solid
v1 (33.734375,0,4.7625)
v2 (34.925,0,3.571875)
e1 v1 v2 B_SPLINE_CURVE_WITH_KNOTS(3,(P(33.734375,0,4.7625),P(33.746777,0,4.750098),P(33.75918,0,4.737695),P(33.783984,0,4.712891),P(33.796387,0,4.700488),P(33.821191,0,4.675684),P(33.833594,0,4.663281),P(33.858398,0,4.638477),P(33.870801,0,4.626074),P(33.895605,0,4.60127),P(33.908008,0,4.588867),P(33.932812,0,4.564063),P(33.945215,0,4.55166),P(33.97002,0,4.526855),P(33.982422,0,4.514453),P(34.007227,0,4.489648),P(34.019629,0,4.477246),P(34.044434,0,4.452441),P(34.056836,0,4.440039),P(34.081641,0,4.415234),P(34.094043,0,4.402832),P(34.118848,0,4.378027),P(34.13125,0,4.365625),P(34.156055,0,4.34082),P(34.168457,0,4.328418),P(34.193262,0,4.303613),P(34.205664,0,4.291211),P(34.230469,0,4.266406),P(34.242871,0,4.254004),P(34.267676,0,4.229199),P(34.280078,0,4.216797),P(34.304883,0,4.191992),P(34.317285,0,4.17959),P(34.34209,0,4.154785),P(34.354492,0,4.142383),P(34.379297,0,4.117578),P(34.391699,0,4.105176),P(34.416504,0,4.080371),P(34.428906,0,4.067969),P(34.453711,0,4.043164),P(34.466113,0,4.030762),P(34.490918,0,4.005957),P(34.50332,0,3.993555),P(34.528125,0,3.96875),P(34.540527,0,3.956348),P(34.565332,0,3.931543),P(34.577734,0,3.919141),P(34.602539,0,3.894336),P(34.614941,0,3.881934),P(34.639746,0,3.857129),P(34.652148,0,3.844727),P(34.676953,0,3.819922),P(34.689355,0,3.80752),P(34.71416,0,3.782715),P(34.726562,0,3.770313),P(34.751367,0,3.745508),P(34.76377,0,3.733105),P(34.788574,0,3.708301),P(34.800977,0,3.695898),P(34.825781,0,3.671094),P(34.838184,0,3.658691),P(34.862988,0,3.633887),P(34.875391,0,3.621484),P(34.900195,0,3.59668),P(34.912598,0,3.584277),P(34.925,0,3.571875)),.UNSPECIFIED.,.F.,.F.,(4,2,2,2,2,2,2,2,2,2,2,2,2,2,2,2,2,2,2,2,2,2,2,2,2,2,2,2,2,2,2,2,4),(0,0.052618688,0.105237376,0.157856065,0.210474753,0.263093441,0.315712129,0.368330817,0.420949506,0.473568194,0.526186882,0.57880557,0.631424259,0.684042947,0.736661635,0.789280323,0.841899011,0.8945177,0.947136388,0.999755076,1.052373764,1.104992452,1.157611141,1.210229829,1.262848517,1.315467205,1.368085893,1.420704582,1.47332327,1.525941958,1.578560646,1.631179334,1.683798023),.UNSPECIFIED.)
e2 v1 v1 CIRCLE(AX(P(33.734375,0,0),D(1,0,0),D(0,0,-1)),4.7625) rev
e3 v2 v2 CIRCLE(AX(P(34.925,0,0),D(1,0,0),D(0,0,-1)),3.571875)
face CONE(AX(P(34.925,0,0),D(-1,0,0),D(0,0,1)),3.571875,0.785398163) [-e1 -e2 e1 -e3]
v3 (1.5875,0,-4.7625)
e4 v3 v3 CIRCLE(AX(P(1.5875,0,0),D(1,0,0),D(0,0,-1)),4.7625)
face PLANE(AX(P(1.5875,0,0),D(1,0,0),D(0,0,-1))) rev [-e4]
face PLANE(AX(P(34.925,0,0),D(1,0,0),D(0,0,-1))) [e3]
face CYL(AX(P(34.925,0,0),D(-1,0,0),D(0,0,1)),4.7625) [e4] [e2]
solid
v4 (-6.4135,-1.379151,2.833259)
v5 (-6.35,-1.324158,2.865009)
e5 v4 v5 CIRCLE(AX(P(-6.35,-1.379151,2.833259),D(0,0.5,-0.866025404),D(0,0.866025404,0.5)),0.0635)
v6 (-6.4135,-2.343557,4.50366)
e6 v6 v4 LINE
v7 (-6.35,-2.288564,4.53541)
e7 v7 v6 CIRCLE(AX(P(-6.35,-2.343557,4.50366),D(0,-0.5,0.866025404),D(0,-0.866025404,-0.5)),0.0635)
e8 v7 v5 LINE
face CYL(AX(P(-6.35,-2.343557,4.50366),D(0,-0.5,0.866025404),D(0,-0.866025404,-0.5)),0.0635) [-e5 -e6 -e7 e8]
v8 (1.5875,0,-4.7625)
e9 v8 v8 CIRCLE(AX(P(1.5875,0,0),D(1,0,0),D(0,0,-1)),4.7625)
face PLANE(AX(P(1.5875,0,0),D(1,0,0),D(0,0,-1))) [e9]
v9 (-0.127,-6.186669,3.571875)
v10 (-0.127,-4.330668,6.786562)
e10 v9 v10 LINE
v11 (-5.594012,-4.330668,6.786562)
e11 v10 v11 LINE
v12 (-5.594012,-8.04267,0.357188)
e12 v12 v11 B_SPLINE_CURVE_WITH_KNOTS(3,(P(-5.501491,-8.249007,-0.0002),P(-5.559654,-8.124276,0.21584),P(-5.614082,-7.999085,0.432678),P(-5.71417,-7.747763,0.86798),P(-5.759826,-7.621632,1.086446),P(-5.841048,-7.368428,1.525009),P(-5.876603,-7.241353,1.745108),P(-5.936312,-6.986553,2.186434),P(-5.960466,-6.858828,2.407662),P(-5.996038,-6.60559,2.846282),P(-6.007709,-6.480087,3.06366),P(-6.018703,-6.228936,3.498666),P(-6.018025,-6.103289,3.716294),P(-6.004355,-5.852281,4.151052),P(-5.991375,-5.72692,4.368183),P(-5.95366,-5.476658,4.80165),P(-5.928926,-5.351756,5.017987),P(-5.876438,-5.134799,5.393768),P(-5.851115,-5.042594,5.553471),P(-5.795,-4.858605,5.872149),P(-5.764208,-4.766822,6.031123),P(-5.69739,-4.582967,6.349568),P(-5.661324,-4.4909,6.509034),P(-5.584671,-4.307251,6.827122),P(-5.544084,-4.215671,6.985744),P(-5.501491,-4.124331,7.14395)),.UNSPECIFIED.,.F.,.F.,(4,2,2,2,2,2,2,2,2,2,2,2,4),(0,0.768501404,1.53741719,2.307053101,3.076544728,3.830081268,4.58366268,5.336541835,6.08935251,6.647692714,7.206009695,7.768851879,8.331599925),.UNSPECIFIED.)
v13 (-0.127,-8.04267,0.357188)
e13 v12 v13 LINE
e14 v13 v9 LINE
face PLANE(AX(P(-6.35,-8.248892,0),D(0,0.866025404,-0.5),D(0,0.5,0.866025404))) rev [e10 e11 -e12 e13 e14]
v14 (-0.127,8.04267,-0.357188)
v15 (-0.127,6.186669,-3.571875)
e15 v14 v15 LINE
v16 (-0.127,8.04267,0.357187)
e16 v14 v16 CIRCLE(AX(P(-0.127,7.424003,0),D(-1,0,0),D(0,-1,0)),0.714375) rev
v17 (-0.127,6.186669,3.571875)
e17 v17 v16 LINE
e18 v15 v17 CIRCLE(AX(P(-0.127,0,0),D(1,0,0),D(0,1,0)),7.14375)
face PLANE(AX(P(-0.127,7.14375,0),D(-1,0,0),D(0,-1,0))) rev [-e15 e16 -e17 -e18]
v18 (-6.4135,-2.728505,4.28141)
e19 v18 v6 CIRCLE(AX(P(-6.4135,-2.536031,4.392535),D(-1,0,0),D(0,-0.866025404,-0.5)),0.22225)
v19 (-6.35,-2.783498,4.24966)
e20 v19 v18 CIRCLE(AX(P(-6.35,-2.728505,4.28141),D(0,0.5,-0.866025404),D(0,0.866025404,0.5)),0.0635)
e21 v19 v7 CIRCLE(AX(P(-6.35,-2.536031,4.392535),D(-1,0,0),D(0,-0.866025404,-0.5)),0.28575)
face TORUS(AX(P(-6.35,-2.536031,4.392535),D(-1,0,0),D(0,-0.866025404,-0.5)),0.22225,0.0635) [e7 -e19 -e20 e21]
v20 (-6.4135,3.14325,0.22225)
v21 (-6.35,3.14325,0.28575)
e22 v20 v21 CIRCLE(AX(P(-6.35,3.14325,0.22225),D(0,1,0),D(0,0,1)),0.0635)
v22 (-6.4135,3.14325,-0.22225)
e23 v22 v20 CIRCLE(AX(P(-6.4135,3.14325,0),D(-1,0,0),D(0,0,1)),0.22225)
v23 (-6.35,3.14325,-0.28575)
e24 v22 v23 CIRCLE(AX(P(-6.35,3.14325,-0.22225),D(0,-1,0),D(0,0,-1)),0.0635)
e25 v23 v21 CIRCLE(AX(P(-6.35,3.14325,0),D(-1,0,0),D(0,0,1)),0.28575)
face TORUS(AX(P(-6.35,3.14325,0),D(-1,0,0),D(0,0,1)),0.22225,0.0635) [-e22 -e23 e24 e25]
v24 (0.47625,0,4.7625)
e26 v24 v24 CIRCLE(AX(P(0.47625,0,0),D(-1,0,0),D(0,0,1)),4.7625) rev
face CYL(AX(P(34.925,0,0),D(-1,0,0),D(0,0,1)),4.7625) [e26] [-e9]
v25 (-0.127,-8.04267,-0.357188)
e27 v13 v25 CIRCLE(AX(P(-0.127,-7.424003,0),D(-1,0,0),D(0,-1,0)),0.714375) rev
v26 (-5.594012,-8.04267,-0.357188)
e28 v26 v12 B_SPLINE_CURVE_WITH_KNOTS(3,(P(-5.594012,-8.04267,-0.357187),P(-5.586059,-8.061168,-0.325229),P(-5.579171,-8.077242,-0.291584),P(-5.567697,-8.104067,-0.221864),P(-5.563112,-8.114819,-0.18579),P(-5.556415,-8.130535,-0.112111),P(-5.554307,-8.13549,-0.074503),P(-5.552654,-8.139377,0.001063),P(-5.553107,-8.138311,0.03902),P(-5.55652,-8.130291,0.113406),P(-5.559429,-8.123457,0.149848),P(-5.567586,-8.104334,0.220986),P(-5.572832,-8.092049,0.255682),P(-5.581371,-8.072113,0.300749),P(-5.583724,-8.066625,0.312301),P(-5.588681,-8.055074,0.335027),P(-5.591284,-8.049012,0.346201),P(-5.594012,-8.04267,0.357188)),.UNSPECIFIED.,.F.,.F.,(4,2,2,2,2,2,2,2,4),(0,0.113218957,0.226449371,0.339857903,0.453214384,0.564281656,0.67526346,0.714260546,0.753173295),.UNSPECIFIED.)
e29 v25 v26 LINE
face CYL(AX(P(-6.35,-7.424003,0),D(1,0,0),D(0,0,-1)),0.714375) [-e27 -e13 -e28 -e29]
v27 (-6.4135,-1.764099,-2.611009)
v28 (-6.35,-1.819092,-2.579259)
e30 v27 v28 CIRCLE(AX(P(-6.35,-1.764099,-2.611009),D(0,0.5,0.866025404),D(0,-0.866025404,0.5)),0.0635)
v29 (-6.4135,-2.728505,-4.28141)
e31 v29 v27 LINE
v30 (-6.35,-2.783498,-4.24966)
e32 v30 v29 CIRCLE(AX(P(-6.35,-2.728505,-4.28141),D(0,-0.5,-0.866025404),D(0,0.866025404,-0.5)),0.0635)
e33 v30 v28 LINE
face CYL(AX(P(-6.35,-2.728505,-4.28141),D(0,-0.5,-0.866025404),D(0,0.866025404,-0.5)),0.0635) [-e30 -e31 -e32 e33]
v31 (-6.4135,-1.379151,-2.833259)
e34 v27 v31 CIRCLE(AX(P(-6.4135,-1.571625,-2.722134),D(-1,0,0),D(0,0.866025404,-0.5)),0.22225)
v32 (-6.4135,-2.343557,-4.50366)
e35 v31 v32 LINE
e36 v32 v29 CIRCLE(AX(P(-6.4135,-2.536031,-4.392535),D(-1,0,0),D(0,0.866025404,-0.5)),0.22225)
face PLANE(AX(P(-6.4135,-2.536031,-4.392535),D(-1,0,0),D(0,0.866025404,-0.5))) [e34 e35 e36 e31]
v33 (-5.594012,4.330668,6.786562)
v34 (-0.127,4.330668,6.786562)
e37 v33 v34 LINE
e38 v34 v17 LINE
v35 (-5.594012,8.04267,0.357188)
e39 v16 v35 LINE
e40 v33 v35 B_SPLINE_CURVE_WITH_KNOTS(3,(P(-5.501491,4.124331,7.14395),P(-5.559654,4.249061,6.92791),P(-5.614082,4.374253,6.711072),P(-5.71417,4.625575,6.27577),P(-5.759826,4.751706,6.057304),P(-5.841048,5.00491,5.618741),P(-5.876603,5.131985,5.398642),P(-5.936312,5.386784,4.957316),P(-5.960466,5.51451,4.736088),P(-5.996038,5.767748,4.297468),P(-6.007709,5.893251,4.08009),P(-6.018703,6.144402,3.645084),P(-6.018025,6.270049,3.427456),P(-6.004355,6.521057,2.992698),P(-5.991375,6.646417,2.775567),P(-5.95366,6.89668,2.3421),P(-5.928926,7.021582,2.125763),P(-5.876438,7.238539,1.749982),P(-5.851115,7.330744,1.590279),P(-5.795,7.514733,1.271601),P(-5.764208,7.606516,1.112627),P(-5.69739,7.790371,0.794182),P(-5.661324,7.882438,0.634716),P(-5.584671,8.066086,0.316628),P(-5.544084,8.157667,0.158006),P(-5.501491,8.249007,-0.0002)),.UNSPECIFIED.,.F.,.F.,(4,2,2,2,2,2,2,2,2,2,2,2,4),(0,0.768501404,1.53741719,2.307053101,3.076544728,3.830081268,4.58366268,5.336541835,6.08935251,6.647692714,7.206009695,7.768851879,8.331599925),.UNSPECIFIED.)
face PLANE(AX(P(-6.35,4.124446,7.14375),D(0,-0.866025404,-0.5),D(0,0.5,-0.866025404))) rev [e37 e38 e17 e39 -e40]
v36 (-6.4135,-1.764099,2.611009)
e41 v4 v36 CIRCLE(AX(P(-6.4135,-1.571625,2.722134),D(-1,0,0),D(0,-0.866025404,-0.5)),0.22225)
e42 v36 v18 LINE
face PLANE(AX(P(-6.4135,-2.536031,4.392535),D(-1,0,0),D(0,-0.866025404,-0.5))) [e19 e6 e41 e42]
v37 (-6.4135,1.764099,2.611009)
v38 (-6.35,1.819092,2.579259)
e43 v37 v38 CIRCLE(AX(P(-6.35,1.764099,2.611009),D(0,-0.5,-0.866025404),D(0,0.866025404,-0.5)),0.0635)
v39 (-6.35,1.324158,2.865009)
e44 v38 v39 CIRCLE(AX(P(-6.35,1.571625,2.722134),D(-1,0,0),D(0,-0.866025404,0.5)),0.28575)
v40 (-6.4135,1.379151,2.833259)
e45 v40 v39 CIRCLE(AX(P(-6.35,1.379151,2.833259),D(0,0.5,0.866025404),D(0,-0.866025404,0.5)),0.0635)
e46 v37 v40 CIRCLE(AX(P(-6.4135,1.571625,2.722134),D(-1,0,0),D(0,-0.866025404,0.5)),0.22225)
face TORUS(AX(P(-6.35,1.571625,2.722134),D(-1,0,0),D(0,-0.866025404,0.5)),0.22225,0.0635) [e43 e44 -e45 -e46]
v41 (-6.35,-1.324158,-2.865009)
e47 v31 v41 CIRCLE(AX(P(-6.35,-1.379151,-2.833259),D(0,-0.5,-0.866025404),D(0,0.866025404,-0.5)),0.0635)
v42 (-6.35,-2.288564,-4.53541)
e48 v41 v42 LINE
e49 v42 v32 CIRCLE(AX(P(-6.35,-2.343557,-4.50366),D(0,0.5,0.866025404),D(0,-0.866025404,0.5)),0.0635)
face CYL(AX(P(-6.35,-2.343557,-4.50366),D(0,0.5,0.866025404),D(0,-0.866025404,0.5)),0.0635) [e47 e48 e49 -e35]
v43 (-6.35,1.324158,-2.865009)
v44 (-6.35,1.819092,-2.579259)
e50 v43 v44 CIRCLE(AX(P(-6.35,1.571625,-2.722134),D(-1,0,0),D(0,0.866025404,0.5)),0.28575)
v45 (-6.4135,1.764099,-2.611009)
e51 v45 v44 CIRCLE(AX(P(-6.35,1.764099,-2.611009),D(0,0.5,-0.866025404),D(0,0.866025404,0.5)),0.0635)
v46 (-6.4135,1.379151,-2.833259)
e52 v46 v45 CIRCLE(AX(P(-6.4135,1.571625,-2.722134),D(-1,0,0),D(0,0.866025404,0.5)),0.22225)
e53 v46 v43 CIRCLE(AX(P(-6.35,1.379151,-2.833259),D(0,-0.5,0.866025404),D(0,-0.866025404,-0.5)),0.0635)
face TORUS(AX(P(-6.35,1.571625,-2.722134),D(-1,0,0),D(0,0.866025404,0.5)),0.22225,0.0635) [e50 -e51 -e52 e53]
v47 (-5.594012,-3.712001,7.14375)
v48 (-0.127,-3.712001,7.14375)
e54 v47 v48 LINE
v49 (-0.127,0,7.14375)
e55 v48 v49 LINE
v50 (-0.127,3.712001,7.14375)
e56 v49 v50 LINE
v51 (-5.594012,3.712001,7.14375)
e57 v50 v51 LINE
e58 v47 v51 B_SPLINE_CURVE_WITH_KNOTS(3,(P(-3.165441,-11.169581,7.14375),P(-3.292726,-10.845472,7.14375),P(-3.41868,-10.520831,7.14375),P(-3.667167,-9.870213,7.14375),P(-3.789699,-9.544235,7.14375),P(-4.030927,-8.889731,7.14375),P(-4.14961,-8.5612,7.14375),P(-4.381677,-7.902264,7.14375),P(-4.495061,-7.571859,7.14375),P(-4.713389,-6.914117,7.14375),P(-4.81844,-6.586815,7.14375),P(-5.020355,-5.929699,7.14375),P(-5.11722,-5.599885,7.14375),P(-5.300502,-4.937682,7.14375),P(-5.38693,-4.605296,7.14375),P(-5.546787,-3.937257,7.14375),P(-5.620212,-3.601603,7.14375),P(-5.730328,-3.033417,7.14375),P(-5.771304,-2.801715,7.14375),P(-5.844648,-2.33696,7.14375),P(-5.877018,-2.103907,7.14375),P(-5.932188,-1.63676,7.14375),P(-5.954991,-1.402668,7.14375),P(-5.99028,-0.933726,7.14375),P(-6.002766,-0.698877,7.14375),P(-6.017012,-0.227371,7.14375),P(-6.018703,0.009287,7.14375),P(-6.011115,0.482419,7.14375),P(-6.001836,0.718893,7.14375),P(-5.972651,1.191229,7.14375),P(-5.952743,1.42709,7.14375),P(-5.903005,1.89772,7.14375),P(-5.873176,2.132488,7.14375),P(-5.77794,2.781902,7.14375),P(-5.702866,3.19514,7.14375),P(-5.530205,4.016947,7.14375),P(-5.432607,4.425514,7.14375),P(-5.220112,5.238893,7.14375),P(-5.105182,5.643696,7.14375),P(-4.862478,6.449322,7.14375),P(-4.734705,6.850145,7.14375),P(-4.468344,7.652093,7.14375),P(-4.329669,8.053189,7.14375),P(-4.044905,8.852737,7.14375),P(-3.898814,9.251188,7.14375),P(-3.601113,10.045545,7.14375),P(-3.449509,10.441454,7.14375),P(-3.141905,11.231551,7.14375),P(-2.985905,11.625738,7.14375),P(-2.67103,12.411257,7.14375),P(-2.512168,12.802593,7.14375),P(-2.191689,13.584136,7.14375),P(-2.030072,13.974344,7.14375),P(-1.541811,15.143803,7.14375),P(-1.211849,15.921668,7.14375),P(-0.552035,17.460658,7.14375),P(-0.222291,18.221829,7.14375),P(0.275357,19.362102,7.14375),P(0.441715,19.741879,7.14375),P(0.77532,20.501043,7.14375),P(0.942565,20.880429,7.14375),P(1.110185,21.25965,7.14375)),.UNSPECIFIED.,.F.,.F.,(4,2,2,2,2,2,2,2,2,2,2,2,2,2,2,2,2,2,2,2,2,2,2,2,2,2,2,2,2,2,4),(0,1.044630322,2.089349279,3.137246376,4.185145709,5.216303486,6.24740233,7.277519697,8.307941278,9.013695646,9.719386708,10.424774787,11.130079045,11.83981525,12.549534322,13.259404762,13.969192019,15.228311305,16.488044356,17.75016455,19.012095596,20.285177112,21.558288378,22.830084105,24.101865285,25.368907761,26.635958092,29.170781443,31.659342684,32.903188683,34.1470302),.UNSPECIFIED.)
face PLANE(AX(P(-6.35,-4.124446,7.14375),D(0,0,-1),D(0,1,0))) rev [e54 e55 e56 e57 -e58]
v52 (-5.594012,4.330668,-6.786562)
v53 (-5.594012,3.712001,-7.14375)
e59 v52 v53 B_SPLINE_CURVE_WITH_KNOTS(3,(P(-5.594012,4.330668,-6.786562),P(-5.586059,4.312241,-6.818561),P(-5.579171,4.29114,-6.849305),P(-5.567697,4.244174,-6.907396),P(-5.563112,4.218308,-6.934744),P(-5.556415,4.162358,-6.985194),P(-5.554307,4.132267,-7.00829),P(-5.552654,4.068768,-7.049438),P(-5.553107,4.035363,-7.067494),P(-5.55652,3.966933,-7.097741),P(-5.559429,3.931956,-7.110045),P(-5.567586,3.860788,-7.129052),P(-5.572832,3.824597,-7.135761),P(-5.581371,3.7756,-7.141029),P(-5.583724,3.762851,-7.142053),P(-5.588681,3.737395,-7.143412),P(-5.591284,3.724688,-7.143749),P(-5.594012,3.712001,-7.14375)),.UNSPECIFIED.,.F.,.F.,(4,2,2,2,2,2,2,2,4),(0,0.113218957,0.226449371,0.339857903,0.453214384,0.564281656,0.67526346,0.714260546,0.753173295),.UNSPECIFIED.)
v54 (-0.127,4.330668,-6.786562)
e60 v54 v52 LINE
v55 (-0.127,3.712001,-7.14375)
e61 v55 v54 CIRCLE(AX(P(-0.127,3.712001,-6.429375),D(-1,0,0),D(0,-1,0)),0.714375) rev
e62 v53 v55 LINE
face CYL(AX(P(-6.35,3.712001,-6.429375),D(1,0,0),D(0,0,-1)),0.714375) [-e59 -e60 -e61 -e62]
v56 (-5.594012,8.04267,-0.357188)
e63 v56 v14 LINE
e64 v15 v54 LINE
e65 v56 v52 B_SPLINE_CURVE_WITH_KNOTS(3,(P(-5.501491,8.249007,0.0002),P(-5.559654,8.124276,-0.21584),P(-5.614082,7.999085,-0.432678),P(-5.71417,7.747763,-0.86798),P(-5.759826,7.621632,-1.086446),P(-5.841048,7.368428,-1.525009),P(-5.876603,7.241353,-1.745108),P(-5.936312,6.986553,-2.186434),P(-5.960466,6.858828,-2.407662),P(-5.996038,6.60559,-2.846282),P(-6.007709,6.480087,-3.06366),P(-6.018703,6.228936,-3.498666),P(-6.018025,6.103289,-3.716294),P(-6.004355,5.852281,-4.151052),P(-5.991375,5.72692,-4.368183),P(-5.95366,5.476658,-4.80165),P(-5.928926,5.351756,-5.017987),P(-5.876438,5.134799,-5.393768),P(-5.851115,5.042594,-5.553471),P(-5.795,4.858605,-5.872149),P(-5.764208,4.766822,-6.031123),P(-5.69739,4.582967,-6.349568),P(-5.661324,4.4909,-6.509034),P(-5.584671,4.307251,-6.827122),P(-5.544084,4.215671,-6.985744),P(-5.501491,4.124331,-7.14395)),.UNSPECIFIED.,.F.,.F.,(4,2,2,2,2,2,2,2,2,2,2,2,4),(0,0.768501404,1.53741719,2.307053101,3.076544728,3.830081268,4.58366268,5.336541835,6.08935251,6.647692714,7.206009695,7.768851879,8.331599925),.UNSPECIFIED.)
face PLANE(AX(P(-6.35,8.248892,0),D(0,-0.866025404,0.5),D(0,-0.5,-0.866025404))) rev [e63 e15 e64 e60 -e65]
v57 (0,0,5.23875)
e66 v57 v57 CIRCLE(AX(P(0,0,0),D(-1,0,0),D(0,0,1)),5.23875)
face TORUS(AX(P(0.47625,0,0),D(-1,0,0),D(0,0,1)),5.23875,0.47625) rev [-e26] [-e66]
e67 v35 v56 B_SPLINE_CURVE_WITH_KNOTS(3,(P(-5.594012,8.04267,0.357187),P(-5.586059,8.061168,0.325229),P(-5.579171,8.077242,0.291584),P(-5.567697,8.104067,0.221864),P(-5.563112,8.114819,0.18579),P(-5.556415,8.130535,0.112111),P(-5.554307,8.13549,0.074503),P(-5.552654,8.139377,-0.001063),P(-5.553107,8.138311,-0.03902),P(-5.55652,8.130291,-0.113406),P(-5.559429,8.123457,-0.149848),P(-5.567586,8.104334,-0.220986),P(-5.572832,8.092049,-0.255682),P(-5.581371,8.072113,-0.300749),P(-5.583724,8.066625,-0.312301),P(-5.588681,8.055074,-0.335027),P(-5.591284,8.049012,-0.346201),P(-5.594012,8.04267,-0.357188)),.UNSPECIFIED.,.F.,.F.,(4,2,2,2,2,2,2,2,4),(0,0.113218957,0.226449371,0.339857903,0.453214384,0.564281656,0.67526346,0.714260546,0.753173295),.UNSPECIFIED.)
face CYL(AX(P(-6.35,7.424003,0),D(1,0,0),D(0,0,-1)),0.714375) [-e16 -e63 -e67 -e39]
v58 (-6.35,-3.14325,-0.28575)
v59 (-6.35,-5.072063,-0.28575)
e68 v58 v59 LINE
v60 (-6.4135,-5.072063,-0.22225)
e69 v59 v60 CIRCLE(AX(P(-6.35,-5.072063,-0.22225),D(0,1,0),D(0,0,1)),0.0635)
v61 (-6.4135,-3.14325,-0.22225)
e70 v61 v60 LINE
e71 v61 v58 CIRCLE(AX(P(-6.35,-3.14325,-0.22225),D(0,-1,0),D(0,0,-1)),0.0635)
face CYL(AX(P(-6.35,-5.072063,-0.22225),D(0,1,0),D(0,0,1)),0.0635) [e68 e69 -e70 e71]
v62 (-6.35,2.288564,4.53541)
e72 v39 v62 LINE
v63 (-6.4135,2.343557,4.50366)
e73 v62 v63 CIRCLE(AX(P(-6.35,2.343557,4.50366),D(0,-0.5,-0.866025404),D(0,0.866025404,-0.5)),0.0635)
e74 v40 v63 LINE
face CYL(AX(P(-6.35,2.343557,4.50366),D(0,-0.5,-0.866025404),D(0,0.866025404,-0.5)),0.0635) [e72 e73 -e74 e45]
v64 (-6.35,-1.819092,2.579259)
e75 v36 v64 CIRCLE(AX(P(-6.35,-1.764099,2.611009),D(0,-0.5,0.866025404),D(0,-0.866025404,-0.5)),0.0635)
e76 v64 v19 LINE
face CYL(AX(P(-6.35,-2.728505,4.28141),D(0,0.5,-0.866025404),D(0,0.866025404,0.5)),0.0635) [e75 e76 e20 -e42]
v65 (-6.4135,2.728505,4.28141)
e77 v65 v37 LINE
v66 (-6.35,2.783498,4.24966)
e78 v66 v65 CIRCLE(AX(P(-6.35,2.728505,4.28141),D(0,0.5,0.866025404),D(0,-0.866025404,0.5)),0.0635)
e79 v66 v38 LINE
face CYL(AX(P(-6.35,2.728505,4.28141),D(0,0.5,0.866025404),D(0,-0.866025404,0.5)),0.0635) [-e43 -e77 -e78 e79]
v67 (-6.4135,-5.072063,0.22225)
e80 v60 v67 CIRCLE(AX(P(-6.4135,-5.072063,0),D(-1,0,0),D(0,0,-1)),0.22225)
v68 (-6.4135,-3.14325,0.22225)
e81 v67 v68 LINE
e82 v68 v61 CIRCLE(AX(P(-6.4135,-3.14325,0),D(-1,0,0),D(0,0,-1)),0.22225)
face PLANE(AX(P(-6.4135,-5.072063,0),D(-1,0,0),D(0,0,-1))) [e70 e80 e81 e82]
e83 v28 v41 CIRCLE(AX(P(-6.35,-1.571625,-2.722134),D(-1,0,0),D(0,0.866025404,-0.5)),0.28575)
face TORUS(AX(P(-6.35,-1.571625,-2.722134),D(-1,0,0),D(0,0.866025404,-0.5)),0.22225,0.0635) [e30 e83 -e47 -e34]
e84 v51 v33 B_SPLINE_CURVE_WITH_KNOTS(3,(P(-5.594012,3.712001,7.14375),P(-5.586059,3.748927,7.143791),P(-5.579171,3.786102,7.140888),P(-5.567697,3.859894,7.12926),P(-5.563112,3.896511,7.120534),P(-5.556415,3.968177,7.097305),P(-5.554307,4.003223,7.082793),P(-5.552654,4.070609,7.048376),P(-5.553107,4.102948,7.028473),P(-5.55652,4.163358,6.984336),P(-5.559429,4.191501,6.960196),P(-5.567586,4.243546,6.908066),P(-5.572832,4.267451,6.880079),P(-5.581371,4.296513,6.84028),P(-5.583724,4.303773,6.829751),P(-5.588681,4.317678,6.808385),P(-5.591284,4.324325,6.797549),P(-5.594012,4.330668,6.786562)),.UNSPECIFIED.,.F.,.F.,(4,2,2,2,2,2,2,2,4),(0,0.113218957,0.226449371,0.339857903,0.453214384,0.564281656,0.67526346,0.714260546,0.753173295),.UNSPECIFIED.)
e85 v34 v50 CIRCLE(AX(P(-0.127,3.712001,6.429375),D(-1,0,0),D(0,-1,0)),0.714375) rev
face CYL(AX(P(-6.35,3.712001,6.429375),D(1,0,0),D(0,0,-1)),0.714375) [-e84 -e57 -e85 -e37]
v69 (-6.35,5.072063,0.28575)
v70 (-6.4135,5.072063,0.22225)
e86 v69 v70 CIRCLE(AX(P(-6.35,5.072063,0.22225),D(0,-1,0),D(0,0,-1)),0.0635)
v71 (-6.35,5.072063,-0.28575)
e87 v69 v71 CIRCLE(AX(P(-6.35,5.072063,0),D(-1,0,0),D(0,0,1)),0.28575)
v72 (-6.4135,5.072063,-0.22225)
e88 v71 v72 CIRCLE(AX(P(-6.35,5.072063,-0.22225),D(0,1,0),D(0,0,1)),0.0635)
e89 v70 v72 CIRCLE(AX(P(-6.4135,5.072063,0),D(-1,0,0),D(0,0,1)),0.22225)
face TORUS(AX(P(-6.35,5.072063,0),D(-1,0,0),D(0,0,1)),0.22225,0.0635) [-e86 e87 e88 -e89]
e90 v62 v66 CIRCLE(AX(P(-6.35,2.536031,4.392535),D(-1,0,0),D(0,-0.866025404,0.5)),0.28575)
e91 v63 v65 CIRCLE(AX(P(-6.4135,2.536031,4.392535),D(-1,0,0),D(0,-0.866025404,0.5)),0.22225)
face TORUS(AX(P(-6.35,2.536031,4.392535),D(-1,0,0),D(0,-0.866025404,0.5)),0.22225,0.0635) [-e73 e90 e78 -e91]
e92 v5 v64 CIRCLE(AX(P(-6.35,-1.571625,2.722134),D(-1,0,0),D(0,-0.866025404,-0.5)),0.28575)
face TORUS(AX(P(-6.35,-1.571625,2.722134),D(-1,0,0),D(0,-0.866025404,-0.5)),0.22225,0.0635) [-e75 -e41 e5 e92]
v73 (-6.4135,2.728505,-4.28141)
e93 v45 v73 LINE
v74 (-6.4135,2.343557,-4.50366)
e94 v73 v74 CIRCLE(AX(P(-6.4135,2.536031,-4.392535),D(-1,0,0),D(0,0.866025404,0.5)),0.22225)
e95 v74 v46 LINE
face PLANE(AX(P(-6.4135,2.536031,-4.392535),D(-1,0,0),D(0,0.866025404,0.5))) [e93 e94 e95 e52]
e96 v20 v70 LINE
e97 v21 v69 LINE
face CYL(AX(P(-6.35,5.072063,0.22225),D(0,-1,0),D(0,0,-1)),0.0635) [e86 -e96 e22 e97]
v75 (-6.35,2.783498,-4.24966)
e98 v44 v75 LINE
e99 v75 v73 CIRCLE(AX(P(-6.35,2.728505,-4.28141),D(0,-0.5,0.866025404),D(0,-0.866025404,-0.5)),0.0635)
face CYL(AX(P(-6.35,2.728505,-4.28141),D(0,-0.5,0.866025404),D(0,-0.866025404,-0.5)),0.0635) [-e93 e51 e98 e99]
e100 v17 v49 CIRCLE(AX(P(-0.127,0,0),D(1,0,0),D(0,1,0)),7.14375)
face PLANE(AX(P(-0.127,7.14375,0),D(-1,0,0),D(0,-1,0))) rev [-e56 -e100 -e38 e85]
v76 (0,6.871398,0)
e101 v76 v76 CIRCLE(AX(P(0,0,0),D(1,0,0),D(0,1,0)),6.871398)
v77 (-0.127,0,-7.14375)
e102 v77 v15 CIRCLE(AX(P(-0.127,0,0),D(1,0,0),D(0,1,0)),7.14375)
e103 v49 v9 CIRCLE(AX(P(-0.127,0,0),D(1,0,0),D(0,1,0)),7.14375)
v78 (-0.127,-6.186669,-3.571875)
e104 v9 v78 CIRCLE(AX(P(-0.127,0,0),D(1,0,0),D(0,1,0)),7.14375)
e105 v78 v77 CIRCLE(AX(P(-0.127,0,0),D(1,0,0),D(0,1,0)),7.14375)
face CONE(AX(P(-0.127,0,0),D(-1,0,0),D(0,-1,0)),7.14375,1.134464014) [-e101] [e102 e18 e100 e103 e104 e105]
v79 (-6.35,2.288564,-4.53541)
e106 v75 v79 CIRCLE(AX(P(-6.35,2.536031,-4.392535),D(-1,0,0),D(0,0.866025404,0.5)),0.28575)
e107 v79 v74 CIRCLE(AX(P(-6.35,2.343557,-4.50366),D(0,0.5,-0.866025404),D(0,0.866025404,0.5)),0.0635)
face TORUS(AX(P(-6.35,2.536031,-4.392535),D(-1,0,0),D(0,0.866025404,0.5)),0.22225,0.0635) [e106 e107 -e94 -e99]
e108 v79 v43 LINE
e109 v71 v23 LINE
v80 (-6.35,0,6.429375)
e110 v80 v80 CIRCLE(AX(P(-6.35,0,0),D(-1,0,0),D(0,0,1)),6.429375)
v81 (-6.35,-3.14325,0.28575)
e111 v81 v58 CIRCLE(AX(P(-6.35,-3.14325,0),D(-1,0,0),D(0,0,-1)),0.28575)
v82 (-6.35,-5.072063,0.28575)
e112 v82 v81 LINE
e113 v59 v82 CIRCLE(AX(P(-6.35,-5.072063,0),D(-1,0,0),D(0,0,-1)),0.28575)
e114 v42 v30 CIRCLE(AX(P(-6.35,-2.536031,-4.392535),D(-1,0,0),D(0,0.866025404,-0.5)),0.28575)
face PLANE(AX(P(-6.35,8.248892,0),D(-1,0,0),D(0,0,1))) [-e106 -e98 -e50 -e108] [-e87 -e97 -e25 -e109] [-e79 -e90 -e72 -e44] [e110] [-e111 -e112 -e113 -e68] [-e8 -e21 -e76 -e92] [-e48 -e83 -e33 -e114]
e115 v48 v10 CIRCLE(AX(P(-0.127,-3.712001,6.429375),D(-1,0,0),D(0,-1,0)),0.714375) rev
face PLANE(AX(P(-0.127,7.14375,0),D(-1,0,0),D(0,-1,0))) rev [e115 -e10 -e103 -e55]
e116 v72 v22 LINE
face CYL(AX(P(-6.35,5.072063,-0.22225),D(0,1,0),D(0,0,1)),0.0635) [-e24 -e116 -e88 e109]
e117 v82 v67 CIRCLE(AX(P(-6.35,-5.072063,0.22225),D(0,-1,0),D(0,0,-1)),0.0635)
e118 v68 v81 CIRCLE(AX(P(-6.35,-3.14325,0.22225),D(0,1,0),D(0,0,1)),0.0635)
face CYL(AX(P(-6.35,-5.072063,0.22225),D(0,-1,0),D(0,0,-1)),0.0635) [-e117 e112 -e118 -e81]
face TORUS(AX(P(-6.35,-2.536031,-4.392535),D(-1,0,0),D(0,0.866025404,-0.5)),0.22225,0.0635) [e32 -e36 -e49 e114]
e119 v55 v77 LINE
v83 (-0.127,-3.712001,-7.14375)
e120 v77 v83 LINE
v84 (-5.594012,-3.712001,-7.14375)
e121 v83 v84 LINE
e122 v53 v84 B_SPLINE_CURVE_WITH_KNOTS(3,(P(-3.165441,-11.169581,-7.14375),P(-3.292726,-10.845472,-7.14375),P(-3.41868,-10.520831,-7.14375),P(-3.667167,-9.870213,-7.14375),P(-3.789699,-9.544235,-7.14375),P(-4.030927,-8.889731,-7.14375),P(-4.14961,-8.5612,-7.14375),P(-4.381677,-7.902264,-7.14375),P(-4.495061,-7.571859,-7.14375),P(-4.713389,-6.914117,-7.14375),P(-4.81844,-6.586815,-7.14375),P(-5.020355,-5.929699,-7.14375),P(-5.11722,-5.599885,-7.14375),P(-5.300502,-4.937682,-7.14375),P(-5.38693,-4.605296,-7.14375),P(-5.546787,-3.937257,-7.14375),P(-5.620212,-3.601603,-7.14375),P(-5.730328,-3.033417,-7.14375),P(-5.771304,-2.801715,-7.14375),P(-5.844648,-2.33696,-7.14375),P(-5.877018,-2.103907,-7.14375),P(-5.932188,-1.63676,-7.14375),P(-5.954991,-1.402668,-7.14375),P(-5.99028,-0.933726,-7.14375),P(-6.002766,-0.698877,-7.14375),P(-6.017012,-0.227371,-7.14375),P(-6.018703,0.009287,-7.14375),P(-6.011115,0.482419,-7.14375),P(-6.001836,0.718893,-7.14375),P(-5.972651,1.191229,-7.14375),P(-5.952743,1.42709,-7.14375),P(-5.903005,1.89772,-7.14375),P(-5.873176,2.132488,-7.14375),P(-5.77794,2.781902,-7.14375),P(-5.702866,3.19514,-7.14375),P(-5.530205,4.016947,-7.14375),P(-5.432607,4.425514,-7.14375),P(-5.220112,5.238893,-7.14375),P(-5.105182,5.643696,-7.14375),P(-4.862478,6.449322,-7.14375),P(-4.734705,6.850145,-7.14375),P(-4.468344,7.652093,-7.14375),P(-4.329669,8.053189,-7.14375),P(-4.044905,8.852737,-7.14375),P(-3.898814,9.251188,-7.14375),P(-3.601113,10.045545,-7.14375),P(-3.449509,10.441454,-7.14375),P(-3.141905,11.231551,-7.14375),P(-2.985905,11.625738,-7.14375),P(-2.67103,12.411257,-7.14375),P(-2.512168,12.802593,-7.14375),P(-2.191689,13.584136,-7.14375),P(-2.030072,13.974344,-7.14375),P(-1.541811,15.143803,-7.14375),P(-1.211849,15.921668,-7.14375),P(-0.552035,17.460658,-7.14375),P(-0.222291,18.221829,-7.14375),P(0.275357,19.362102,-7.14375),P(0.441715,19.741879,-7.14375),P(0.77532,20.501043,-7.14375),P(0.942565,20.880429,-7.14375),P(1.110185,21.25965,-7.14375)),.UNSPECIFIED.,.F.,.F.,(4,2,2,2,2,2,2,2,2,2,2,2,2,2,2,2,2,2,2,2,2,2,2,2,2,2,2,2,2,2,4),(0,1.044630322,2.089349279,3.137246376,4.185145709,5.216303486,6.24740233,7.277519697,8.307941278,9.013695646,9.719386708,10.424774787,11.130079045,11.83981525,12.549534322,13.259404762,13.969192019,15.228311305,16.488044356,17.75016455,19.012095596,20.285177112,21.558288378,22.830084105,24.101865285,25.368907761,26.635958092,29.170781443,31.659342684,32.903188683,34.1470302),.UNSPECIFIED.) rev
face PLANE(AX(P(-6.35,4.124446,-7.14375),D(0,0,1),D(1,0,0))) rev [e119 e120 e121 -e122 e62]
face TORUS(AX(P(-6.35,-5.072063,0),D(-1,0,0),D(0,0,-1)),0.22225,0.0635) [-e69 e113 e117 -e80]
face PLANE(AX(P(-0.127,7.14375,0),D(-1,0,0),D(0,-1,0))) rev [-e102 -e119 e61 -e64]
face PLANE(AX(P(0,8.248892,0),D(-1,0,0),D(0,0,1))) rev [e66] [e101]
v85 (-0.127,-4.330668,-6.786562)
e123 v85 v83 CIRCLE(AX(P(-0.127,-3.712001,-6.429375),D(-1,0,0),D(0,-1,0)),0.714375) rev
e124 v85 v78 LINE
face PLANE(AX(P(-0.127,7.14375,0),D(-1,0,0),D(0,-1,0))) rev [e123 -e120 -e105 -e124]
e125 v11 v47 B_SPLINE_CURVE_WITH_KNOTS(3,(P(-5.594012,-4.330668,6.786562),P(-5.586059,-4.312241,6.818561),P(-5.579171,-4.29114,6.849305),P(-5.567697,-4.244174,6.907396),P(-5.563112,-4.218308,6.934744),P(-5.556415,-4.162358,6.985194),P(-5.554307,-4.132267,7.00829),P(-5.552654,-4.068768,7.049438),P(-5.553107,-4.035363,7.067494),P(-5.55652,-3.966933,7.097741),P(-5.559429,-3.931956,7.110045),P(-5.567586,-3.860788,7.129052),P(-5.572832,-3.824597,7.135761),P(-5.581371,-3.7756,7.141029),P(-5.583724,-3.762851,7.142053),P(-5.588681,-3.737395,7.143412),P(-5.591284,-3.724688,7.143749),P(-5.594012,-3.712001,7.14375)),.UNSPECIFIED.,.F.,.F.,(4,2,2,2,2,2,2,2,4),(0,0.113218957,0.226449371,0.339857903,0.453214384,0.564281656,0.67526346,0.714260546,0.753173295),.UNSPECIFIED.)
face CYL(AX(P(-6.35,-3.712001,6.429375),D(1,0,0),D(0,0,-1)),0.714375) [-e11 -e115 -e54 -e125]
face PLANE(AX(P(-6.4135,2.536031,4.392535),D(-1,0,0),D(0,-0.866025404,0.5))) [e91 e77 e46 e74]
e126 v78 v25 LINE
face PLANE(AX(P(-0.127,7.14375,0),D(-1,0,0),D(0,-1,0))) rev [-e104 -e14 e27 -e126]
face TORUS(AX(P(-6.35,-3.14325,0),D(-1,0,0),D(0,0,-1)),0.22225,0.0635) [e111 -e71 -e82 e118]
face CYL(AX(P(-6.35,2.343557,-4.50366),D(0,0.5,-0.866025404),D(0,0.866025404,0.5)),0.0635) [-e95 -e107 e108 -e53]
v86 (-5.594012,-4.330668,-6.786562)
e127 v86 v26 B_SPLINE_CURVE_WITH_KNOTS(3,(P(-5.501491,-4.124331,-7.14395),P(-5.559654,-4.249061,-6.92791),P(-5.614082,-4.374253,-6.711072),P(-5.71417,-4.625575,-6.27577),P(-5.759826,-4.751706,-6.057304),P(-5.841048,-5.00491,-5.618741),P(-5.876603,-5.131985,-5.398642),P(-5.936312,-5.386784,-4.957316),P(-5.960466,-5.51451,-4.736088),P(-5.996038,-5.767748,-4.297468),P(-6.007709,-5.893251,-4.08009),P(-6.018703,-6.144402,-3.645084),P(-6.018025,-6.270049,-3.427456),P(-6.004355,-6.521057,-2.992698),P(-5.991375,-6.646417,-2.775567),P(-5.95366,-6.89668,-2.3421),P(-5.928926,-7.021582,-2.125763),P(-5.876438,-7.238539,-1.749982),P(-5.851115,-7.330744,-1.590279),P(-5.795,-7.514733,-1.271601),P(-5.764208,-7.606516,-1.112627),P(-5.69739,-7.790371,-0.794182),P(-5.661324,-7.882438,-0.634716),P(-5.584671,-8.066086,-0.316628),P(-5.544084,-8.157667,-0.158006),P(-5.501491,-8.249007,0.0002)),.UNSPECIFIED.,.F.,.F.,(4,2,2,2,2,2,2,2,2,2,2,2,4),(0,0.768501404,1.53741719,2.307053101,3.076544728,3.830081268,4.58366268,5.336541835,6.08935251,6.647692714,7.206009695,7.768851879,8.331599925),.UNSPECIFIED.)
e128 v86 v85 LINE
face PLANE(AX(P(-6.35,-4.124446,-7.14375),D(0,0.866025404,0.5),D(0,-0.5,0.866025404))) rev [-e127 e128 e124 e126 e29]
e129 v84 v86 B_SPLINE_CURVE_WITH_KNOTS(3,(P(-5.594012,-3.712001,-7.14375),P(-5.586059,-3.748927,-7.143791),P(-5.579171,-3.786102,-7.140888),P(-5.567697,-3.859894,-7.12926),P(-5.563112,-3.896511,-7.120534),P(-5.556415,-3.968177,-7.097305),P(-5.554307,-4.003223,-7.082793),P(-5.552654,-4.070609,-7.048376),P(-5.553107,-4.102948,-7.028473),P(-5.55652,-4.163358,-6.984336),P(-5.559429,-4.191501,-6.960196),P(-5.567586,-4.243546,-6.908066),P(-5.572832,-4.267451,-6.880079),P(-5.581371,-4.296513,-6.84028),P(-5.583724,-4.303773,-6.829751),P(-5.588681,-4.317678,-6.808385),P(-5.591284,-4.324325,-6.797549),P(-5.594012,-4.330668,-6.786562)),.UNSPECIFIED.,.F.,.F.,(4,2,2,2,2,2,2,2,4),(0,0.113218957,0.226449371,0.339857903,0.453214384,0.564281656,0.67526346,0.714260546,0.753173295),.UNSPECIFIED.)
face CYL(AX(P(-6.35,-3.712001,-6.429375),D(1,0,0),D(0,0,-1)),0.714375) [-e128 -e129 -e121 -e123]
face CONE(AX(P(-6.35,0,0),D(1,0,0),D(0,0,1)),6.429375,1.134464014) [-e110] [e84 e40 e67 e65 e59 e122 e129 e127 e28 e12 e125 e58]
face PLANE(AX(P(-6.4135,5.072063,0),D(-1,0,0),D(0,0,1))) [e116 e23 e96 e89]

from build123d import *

# Parameters (mm, degrees)
SKETCH2_R                = 4.7625
BOSS_EXTRUDE1_DEPTH      = 34.925
BOSS_EXTRUDE2_DEPTH      = 6.35
SKETCH5_OUTSIDE_W        = 52.862
SKETCH5_OUTSIDE_H        = 55.072
SKETCH5_OUTSIDE_R        = 6.429375
CUT_EXTRUDE1_DEPTH       = 6.35
CUT_EXTRUDE1_DRAFT       = -65
BOSS_EXTRUDE5_DEPTH      = 0.0635
FILLET5_R                = 0.0635
CIRPATTERN1_COUNT        = 6
FILLET5_OF_CIRPATTERN1_R = 0.0635
FILLET7_R                = 0.714375
CHAMFER1_SIZE            = 1.190625
FILLET4_R                = 0.47625


with BuildPart() as part:
    # Sketch2 → Boss-Extrude1 (new body)
    with BuildSketch(Plane(origin=(0, 0, 0), x_dir=(0, 0, -1), z_dir=(1, 0, 0))):
        Circle(SKETCH2_R)
    extrude(amount=BOSS_EXTRUDE1_DEPTH)

    # Sketch3 → Boss-Extrude2 (add)
    with BuildSketch(Plane.ZY):
        Polygon((0, 8.248891971), (-7.14375, 4.124445986), (-7.14375, -4.124445986), (0, -8.248891971), (7.14375, -4.124445986), (7.14375, 4.124445986), align=None)
    extrude(amount=BOSS_EXTRUDE2_DEPTH)


with BuildPart() as cut_extrude1_tool:
    # Sketch5 outside → Cut-Extrude1 (with draft: the straight prism first)
    with BuildSketch(Plane.ZY.offset(6.35)):
        Rectangle(SKETCH5_OUTSIDE_W, SKETCH5_OUTSIDE_H)
        Circle(SKETCH5_OUTSIDE_R, mode=Mode.SUBTRACT)
    extrude(amount=-CUT_EXTRUDE1_DEPTH)
    # Cut-Extrude1: the draft: its side faces are tilted about the plane it starts from
    cut_extrude1_sides = [cut_extrude1_tool.faces().sort_by_distance(p)[0] for p in [
        (-3.175, -27.536, 0),
        (-3.175, 0, 26.431),
        (-3.175, 27.536, 0),
        (-3.175, 0, -26.431),
        (-3.175, 0, -6.429375),
    ]]
    draft(cut_extrude1_sides, Plane.ZY.offset(6.35), CUT_EXTRUDE1_DRAFT)


with BuildPart() as part_1:
    add(part.part)

    # Cut-Extrude1: cut by cut_extrude1_tool
    add(cut_extrude1_tool.part, mode=Mode.SUBTRACT)

    # Sketch11 → Boss-Extrude5 (add)
    with BuildSketch(Plane.ZY.offset(6.35)):
        with BuildLine():
            Line((0.28575, 5.0720625), (0.28575, 3.14325))
            ThreePointArc((0.28575, 3.14325), (0, 2.8575), (-0.28575, 3.14325))
            Line((-0.28575, 3.14325), (-0.28575, 5.0720625))
            ThreePointArc((-0.28575, 5.0720625), (0, 5.3578125), (0.28575, 5.0720625))
        make_face()
    boss_extrude5 = extrude(amount=BOSS_EXTRUDE5_DEPTH)

    # Fillet5
    fillet5_edges = [part_1.edges().sort_by_distance(p)[0] for p in [
        (-6.4135, 4.10765625, 0.28575),
        (-6.4135, 2.8575, 0),
        (-6.4135, 4.10765625, -0.28575),
        (-6.4135, 5.3578125, 0),
    ]]
    fillet(fillet5_edges, radius=FILLET5_R - 0.0001)  # a hair under: the kernel refuses the full size

    # CirPattern1: Boss-Extrude5 ×6 about axis
    cirpattern1_axis = Axis((0, 0, 0), (1, 0, 0))
    for i in range(1, CIRPATTERN1_COUNT):
        add(boss_extrude5.rotate(cirpattern1_axis, i * 360 / CIRPATTERN1_COUNT))

    # Fillet5 of CirPattern1
    fillet5_of_cirpattern1_edges = [part_1.edges().sort_by_distance(p)[0] for p in [
        (-6.4135, 1.806361366, 3.700209663),
        (-6.4135, 1.42875, 2.474667591),
        (-6.4135, 2.301294884, 3.414459663),
        (-6.4135, 2.67890625, 4.640001734),
        (-6.4135, -2.301294884, 3.414459663),
        (-6.4135, -1.42875, 2.474667591),
        (-6.4135, -1.806361366, 3.700209663),
        (-6.4135, -2.67890625, 4.640001734),
        (-6.4135, -4.10765625, -0.28575),
        (-6.4135, -2.8575, 0),
        (-6.4135, -4.10765625, 0.28575),
        (-6.4135, -5.3578125, 0),
        (-6.4135, -1.806361366, -3.700209663),
        (-6.4135, -1.42875, -2.474667591),
        (-6.4135, -2.301294884, -3.414459663),
        (-6.4135, -2.67890625, -4.640001734),
        (-6.4135, 2.301294884, -3.414459663),
        (-6.4135, 1.42875, -2.474667591),
        (-6.4135, 1.806361366, -3.700209663),
        (-6.4135, 2.67890625, -4.640001734),
    ]]
    fillet(fillet5_of_cirpattern1_edges, radius=FILLET5_OF_CIRPATTERN1_R - 0.0001)  # a hair under: the kernel refuses the full size

    # Fillet7
    fillet7_edges = [part_1.edges().sort_by_distance(p)[0] for p in [
        (-2.750772651, -8.248891971, 0),
        (-2.750772651, -4.124445986, -7.14375),
        (-2.750772651, 4.124445986, -7.14375),
        (-2.750772651, 8.248891971, 0),
        (-2.750772651, -4.124445986, 7.14375),
        (-2.750772651, 4.124445986, 7.14375),
    ]]
    fillet(fillet7_edges, radius=FILLET7_R)

    # Chamfer1
    chamfer1_edges = [part_1.edges().sort_by_distance(p)[0] for p in [
        (34.925, 0, 4.7625),
    ]]
    chamfer(chamfer1_edges, length=CHAMFER1_SIZE)

    # Sketch15 → Cut-Revolve1 (revolve, cut)
    with BuildSketch(Plane.XY, mode=Mode.PRIVATE) as cut_revolve1_sk:
        Polygon((0, 6.871397621), (-0.127, 7.14375), (-0.127, 8.248891971), (0, 8.248891971), align=None)
    revolve(cut_revolve1_sk.sketch.rotate(Axis((0, 0, 0), (-1, 0, 0)), 270), axis=Axis((0, 0, 0), (-1, 0, 0)), mode=Mode.SUBTRACT)

    # Fillet4
    fillet4_edges = [part_1.edges().sort_by_distance(p)[0] for p in [
        (0, 0, 4.7625),
    ]]
    fillet(fillet4_edges, radius=FILLET4_R)


with BuildPart() as body_2:
    # Split1: the piece on the far side of the plane
    add(part_1.part)
    split(bisect_by=Plane(origin=(1.5875, 0, 0), x_dir=(0, 0, 1), z_dir=(1, 0, 0)), keep=Keep.BOTTOM)


with BuildPart() as part_2:
    add(part_1.part)

    # Split1
    split(bisect_by=Plane(origin=(1.5875, 0, 0), x_dir=(0, 0, 1), z_dir=(1, 0, 0)), keep=Keep.TOP)


solid = Compound([body_2.part, part_2.part])
